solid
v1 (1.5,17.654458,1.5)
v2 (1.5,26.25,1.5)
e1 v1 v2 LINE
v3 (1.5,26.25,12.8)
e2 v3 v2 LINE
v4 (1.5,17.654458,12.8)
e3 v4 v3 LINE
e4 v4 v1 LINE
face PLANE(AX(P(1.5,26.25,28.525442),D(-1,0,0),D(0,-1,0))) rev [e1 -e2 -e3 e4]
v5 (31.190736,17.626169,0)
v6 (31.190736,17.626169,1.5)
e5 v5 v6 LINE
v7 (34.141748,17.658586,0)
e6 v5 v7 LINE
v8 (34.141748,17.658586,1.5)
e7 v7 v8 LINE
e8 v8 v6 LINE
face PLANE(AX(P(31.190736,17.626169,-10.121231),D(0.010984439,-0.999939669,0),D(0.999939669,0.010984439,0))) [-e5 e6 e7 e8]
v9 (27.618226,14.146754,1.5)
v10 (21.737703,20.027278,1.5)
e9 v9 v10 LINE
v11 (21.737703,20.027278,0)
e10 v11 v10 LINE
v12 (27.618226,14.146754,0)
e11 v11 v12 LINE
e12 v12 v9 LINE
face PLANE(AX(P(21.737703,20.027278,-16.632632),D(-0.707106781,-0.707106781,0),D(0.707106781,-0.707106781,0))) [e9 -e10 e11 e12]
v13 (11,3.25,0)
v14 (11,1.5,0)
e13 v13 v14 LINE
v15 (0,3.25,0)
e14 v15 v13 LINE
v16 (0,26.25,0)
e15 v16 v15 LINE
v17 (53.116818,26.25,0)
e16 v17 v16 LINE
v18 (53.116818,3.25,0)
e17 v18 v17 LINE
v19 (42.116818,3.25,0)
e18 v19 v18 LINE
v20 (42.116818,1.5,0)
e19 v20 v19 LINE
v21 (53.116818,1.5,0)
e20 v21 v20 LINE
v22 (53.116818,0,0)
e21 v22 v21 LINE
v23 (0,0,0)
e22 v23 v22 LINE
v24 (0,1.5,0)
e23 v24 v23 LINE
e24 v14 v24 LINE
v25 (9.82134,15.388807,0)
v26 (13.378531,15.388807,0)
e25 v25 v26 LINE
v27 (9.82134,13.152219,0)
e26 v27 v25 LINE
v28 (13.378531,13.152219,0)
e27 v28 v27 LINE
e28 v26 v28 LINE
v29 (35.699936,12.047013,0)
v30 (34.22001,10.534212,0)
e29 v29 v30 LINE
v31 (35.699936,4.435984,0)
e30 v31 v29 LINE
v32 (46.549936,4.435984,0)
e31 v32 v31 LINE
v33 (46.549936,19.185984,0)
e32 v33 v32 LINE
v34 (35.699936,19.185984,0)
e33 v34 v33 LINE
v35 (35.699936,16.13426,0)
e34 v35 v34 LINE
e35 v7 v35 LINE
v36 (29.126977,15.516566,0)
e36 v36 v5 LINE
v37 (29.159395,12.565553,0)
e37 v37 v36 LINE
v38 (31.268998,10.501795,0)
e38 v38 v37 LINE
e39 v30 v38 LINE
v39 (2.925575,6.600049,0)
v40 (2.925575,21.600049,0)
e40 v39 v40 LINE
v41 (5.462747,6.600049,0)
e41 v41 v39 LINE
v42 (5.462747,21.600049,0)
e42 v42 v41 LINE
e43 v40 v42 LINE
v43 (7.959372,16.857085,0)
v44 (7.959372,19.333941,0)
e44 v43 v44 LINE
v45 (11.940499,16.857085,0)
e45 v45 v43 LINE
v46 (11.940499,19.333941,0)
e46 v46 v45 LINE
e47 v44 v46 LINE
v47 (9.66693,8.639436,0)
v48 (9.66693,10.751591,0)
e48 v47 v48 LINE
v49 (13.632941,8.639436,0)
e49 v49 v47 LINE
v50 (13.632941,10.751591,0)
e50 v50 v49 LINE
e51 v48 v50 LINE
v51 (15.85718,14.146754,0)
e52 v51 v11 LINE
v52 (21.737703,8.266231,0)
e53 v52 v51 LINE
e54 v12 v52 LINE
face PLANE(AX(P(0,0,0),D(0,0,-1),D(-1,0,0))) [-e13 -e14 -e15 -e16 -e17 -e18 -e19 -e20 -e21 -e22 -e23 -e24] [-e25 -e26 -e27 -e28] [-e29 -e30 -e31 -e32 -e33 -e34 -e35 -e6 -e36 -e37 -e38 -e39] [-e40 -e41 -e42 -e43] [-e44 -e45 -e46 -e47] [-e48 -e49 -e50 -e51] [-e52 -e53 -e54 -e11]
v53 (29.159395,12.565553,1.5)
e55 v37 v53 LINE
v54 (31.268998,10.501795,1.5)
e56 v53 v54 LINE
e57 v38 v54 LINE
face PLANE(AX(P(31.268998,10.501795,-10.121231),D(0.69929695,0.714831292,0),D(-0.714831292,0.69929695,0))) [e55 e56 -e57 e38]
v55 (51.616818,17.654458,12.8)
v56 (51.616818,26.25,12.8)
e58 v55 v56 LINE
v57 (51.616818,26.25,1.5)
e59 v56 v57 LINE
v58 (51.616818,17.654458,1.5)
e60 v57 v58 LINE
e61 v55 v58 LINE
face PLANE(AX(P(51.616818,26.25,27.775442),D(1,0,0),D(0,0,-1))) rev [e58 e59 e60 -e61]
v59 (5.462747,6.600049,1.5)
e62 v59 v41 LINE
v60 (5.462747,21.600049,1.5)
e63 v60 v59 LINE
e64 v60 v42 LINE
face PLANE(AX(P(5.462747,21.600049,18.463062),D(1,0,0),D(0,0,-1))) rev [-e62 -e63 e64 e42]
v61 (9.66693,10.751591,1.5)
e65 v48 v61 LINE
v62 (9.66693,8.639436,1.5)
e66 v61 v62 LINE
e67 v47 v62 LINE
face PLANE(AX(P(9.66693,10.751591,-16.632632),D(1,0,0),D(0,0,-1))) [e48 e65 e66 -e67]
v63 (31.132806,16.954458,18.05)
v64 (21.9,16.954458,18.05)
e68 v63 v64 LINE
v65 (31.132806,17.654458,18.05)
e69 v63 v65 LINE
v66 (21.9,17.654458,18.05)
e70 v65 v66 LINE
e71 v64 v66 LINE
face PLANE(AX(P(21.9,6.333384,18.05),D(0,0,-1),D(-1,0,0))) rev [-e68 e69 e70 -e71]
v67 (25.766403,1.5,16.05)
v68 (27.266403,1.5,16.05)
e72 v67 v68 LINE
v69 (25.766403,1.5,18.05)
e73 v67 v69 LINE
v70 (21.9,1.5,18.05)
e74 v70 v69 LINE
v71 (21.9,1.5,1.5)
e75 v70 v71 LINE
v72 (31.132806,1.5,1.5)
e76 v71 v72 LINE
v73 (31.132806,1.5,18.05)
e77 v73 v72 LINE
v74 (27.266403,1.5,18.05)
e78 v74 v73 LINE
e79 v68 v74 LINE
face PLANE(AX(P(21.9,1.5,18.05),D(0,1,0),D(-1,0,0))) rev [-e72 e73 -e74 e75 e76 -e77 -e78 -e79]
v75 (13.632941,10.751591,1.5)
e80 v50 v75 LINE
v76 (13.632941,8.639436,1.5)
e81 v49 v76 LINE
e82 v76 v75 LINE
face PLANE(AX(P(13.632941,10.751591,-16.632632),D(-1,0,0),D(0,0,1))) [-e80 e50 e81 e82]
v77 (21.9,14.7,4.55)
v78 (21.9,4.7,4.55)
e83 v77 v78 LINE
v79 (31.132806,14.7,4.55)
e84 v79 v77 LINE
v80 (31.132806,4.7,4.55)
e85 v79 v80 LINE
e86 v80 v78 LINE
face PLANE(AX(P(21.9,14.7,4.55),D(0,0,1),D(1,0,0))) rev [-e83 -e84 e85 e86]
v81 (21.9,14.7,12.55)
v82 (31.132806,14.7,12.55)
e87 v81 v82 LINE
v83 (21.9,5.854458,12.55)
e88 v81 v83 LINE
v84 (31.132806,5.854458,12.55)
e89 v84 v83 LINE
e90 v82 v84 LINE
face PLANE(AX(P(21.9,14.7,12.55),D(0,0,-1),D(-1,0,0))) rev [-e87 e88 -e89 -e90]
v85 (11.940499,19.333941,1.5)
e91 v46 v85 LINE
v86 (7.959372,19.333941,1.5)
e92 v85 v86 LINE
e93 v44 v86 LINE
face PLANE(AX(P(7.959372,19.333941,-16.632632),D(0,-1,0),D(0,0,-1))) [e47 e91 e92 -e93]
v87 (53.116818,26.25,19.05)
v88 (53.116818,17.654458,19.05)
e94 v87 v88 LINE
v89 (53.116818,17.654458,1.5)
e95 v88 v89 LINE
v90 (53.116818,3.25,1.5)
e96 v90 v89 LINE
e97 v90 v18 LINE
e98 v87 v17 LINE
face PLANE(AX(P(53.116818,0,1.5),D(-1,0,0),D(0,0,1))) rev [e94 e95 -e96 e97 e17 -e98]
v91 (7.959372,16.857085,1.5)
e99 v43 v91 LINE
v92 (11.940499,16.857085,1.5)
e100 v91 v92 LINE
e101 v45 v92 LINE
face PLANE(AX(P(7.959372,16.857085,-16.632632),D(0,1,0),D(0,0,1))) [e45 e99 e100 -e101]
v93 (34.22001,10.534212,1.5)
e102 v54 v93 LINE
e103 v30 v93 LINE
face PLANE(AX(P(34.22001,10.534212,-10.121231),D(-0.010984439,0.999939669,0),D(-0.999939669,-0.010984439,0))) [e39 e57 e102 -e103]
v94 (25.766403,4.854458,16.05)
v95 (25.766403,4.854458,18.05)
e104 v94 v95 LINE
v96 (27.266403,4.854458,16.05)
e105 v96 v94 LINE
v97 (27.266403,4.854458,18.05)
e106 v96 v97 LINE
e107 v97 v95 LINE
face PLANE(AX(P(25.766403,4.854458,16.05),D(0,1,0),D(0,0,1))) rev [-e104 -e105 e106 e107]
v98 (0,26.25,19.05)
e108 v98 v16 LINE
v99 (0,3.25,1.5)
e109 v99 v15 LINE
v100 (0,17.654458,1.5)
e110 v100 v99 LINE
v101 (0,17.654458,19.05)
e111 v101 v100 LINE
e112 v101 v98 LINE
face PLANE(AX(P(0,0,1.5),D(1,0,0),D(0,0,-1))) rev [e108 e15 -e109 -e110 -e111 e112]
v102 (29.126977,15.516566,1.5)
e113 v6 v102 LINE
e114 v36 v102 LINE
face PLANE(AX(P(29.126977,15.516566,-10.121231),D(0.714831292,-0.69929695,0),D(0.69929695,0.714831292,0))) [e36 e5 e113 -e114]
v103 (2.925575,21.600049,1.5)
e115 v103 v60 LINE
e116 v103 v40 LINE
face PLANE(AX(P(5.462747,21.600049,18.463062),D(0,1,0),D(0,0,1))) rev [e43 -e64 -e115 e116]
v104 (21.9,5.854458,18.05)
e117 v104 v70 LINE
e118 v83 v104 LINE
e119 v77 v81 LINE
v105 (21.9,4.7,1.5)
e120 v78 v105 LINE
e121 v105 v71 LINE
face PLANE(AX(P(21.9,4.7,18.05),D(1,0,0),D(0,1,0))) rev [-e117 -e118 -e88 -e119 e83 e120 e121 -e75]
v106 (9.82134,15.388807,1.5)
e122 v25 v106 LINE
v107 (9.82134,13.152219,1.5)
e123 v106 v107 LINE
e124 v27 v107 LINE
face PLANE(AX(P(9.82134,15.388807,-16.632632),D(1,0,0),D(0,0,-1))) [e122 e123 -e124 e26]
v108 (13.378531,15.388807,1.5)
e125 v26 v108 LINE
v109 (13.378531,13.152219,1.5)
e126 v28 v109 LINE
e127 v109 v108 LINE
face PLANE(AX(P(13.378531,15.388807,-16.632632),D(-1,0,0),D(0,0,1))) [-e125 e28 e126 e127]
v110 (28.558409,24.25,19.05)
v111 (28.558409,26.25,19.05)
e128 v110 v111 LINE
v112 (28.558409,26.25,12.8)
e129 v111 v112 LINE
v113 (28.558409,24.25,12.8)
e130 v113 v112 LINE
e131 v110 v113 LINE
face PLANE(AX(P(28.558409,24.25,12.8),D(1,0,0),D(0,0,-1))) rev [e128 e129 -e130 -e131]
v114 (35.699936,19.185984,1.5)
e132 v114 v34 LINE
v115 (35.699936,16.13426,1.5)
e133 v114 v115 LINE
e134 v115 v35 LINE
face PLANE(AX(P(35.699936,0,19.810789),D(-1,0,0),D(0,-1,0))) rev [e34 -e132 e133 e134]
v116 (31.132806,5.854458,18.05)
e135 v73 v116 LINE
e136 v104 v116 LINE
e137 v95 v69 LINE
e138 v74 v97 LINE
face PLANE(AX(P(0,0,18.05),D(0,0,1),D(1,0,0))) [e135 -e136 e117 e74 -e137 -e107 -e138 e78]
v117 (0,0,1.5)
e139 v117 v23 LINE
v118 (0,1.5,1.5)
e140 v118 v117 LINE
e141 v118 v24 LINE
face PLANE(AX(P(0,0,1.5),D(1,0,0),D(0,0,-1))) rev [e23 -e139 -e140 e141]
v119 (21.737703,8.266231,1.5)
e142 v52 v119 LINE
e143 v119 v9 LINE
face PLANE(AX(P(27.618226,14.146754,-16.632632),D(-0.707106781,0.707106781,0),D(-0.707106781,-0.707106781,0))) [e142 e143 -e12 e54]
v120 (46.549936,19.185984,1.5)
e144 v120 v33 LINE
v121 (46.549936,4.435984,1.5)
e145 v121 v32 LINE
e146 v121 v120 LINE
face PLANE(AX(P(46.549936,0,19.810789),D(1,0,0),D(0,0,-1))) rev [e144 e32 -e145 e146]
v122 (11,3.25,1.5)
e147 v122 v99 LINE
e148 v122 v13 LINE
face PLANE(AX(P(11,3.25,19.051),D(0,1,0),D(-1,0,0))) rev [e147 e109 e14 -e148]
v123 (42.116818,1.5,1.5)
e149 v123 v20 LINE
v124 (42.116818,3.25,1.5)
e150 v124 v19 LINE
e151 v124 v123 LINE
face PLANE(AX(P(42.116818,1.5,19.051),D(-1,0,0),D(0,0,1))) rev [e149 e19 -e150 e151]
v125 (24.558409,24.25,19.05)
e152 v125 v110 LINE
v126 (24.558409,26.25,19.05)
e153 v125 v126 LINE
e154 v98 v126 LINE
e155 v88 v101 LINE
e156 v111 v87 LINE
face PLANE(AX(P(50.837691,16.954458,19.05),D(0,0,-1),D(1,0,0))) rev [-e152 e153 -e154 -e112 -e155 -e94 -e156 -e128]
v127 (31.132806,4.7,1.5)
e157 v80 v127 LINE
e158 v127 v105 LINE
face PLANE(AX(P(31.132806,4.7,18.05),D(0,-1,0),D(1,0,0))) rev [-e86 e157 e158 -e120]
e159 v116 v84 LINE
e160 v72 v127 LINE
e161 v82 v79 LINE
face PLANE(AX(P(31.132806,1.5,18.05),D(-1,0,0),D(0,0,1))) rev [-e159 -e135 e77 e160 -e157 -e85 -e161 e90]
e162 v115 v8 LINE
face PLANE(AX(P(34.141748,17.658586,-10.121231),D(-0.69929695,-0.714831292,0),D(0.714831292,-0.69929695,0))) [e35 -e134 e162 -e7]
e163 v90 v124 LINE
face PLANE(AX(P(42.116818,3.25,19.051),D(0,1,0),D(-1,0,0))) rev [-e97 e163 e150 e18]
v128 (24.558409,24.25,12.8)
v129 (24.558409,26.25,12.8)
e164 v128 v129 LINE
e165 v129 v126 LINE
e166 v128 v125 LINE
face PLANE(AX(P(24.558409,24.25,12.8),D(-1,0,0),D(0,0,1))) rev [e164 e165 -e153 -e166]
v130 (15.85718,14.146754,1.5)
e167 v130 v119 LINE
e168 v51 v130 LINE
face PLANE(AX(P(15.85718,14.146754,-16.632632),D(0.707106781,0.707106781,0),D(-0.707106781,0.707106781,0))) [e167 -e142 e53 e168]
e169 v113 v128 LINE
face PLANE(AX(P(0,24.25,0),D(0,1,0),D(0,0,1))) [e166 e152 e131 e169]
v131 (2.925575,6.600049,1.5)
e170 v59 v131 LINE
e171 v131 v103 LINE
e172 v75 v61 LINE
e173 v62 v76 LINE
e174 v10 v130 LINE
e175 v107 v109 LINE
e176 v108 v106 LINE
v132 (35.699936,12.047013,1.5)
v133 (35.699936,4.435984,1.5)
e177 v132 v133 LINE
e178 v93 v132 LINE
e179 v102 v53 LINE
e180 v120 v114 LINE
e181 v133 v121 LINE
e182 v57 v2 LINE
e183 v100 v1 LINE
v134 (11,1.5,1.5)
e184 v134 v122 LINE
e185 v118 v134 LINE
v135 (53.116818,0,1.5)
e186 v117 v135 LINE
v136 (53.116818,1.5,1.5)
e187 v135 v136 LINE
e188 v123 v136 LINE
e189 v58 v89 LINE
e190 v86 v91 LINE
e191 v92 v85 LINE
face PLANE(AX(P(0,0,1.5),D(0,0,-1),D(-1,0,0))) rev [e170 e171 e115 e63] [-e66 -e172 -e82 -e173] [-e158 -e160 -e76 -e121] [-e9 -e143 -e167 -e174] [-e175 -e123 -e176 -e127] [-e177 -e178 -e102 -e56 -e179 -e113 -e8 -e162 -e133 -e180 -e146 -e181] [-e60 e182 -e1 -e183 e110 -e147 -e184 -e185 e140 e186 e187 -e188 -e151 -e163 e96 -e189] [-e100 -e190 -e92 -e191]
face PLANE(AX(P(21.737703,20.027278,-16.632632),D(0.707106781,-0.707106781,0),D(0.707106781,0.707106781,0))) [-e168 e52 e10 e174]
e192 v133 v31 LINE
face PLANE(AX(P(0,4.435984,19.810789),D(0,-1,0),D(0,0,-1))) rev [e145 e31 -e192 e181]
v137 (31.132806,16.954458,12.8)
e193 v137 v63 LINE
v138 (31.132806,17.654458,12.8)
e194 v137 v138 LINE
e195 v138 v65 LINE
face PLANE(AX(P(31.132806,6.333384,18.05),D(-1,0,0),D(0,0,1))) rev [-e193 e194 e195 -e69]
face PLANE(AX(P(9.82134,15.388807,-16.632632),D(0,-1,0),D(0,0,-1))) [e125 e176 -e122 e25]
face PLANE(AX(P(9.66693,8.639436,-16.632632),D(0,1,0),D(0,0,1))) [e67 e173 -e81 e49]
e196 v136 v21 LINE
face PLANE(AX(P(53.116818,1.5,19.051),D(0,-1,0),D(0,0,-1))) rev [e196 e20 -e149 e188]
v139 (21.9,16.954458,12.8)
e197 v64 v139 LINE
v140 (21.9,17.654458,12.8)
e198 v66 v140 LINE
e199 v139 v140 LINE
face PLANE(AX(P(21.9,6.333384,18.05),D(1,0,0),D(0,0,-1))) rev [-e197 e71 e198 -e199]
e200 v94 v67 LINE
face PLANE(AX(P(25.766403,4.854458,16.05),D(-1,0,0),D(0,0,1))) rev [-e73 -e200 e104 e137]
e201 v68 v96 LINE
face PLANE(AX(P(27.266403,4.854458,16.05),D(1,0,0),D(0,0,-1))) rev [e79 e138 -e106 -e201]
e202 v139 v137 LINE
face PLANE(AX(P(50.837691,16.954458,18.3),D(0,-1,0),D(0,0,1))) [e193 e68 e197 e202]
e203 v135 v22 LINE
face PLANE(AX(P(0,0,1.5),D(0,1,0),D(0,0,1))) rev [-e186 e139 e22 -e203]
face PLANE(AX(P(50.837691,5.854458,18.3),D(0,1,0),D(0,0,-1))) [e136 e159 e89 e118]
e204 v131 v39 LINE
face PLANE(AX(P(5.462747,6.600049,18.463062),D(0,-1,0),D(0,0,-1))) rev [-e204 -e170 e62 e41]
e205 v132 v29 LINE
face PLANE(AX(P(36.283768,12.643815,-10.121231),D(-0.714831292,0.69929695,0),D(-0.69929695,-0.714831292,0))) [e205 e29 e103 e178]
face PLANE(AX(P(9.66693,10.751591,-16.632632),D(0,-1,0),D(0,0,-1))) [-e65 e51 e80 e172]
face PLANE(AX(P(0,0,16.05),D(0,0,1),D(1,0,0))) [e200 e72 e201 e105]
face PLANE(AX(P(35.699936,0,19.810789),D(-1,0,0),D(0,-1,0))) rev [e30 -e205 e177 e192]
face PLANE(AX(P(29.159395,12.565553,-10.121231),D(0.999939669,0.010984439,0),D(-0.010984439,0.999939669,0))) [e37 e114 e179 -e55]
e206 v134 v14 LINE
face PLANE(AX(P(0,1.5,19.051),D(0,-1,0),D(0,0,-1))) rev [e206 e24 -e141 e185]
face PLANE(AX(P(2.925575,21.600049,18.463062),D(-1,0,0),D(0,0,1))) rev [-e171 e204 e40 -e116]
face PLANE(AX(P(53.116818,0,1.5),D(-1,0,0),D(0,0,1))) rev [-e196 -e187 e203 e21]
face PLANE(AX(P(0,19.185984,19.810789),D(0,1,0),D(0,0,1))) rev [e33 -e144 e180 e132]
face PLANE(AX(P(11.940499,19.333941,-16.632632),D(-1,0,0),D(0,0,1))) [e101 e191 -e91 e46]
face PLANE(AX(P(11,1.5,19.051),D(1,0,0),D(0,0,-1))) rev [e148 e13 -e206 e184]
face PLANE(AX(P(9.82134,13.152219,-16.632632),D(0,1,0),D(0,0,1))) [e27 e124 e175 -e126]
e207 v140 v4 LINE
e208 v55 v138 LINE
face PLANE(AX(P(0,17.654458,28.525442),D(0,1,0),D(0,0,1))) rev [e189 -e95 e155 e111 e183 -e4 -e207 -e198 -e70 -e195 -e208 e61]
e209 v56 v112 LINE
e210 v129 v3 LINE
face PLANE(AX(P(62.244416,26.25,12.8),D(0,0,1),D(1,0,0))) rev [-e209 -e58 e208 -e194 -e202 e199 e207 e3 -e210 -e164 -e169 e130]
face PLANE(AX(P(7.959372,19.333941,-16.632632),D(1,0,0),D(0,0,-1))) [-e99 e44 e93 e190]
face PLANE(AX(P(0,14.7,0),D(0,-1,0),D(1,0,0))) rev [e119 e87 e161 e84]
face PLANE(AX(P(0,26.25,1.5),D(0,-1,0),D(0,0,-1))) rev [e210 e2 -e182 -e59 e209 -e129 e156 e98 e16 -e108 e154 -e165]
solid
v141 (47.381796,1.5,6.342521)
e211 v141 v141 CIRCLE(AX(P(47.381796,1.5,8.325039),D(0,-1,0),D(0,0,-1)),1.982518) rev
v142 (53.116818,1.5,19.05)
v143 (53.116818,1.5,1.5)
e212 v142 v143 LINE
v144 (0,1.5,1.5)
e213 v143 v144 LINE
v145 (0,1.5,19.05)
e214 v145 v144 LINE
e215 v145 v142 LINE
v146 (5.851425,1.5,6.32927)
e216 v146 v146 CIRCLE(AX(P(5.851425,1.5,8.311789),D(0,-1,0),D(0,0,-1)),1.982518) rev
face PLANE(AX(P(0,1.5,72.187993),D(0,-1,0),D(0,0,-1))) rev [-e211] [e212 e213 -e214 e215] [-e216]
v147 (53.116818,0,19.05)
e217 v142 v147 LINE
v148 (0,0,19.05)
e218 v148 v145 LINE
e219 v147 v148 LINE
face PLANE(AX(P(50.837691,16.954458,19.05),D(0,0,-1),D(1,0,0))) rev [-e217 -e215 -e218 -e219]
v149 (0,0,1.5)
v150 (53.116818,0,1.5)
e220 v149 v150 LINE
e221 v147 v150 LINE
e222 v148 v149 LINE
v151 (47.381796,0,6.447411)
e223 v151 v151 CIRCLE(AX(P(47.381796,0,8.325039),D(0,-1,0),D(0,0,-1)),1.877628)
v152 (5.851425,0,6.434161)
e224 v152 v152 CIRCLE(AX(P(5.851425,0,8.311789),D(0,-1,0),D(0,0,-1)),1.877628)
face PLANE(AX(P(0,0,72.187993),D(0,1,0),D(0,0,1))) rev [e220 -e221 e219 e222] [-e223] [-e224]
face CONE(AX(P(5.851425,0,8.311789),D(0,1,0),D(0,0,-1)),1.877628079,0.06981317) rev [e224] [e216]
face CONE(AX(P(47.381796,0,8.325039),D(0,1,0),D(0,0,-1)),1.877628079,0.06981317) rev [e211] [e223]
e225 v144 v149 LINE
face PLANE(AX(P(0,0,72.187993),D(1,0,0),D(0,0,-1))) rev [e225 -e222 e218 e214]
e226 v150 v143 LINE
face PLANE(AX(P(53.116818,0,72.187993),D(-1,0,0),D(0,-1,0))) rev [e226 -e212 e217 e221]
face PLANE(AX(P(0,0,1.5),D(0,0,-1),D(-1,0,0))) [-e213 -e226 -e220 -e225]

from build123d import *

# Parameters (mm, degrees)
SKETCH1_W                              = 53.116817528
SKETCH1_H                              = 26.25
FRONT_SIDE_MAIN_DEPTH                  = 1.5
RESET_HOLE_DEPTH                       = 3.25
SKETCH15_W                             = 3.966010581
SKETCH15_H                             = 2.112155191
SKETCH15_W_2                           = 3.557190409
SKETCH15_H_2                           = 2.236587576
SKETCH15_W_3                           = 3.981127105
SKETCH15_H_3                           = 2.476855865
COMPONENT_HOLES_DEPTH                  = 3.25
SKETCH16_W                             = 10.85
SKETCH16_H                             = 14.75
MICROPHONE_HOLE_DEPTH                  = 1.5
SKETCH24_W                             = 1.5
SKETCH24_H                             = 8.595542059
RIGHT_SIDE_TOP_DEPTH                   = 17.55
SKETCH20_W                             = 53.116817528
SKETCH20_H                             = 1.5
BOTTOM_BASE_DEPTH                      = 17.55
SKETCH26_W                             = 1.5
SKETCH26_H                             = 8.595542059
LEFT_SIDE_TOP_DEPTH                    = 17.55
SKETCH27_W                             = 6.25
SKETCH27_H                             = 8.595542059
BACK_BAR_TOP_DEPTH                     = 50.116817528
SERVO_SEPERATOR_BOTTOM_OUTLINE_W       = 9.232806166
SERVO_SEPERATOR_BOTTOM_OUTLINE_H       = 3.2
SERVO_SEPERATOR_BOTTOM_DEPTH           = 16.55
SKETCH28_W                             = 9.232806166
SKETCH28_H                             = 5.25
BACK_BATTERY_HOLDER_TOP_DEPTH          = 0.7
SKETCH34_W                             = 2.537171882
SKETCH34_H                             = 15
PROGRAMMING_HOLE_DEPTH                 = 3.25
SKETCH38_W                             = 9.232806166
SKETCH38_H                             = 5.5
BACK_BATTERY_HOLDER_BOTTOM_DEPTH       = 1.154457941
SKETCH40_R                             = 1.877628079
SERVO_ARM_HOLES_BOTTOM_DEPTH           = 1.5
SERVO_ARM_HOLES_BOTTOM_DRAFT           = 4
SERVO_ARM_HOLES_BOTTOM_PROFILE_2_DEPTH = 1.5
SERVO_ARM_HOLES_BOTTOM_PROFILE_2_DRAFT = 4
SKETCH44_W                             = 1.5
SKETCH44_H                             = 3.354457941
SNAP_HOLE_BOTTOM_DEPTH                 = 2
SKETCH46_W                             = 4
SKETCH46_H                             = 6.25
SNAP_CUT_TOP_DEPTH                     = 2
SKETCH47_W                             = 11
SKETCH47_H                             = 1.75
SOLAR_ARM_HOLES_FRONT_DEPTH            = 1.5
SKETCH49_W                             = 9.232806166
SKETCH49_H                             = 8
RAISED_SERVO_SEPERATOR_DEPTH           = 10


# Read off the part's stored shape, not the designer's step: Servo Seperator - Bottom
with BuildPart() as part:
    # Sketch1 → Front Side - Main (new body)
    with BuildSketch(Plane.XY):
        with Locations((26.558408764, 13.125)):
            Rectangle(SKETCH1_W, SKETCH1_H)
    extrude(amount=FRONT_SIDE_MAIN_DEPTH)

    # Reset Hole Sketch → Reset Hole (cut)
    with BuildSketch(Plane(origin=(0, 0, 3.25), x_dir=(-1, 0, 0), z_dir=(0, 0, -1))):
        Polygon((-31.190735744, 17.626168756), (-34.141748042, 17.658585925), (-36.251351249, 15.594827519), (-36.283768419, 12.643815222), (-34.220010013, 10.534212015), (-31.268997715, 10.501794845), (-29.159394508, 12.565553251), (-29.126977338, 15.516565548), align=None)
    extrude(amount=RESET_HOLE_DEPTH, mode=Mode.SUBTRACT)

    # Sketch15 → Component Holes (cut)
    with BuildSketch(Plane(origin=(0, 0, 3.25), x_dir=(-1, 0, 0), z_dir=(0, 0, -1))):
        Polygon((-21.737702993, 20.027277789), (-15.857179586, 14.146754382), (-21.737702993, 8.266230975), (-27.6182264, 14.146754382), align=None)
        with Locations((-11.649935563, 9.695513201)):
            Rectangle(SKETCH15_W, SKETCH15_H)
        with Locations((-11.599935563, 14.270513201)):
            Rectangle(SKETCH15_W_2, SKETCH15_H_2)
        with Locations((-9.949935563, 18.095513201)):
            Rectangle(SKETCH15_W_3, SKETCH15_H_3)
    extrude(amount=COMPONENT_HOLES_DEPTH, mode=Mode.SUBTRACT)

    # Sketch16 → Microphone Hole (cut)
    with BuildSketch(Plane(origin=(0, 0, 0), x_dir=(-1, 0, 0), z_dir=(0, 0, -1))):
        with Locations((-41.124935562, 11.81098353)):
            Rectangle(SKETCH16_W, SKETCH16_H)
    extrude(amount=-MICROPHONE_HOLE_DEPTH, mode=Mode.SUBTRACT)

    # Sketch24 → Right Side - Top (add)
    with BuildSketch(Plane.XY.offset(1.5)):
        with Locations((0.75, 21.952228971)):
            Rectangle(SKETCH24_W, SKETCH24_H)
    extrude(amount=RIGHT_SIDE_TOP_DEPTH)

    # Sketch26 → Left Side - Top (add)
    with BuildSketch(Plane.XY.offset(1.5)):
        with Locations((52.366817528, 21.952228971)):
            Rectangle(SKETCH26_W, SKETCH26_H)
    extrude(amount=LEFT_SIDE_TOP_DEPTH)

    # Sketch27 → Back Bar - Top (add)
    with BuildSketch(Plane(origin=(1.5, 0, 0), x_dir=(0, 0, -1), z_dir=(1, 0, 0))):
        with Locations((-15.925, 21.952228971)):
            Rectangle(SKETCH27_W, SKETCH27_H)
    extrude(amount=BACK_BAR_TOP_DEPTH)

    # Servo Seperator - Bottom outline → Servo Seperator - Bottom (add)
    with BuildSketch(Plane.XY.offset(1.5)):
        with Locations((26.516403083, 3.1)):
            Rectangle(SERVO_SEPERATOR_BOTTOM_OUTLINE_W, SERVO_SEPERATOR_BOTTOM_OUTLINE_H)
    extrude(amount=SERVO_SEPERATOR_BOTTOM_DEPTH)

    # Sketch28 → Back Battery Holder - Top (add)
    with BuildSketch(Plane.XZ.offset(-17.654457941)):
        with Locations((26.516403083, 15.425)):
            Rectangle(SKETCH28_W, SKETCH28_H)
    extrude(amount=BACK_BATTERY_HOLDER_TOP_DEPTH)

    # Sketch34 → Programming Hole (cut)
    with BuildSketch(Plane(origin=(0, 0, 0), x_dir=(-1, 0, 0), z_dir=(0, 0, -1))):
        with Locations((-4.194161079, 14.100049249)):
            Rectangle(SKETCH34_W, SKETCH34_H)
    extrude(amount=-PROGRAMMING_HOLE_DEPTH, mode=Mode.SUBTRACT)

    # Sketch38 → Back Battery Holder - Bottom (add)
    with BuildSketch(Plane(origin=(0, 4.7, 0), x_dir=(1, 0, 0), z_dir=(0, 1, 0))):
        with Locations((26.516403083, -15.3)):
            Rectangle(SKETCH38_W, SKETCH38_H)
    extrude(amount=BACK_BATTERY_HOLDER_BOTTOM_DEPTH)

    # Sketch44 → Snap Hole - Bottom (cut)
    with BuildSketch(Plane.XY.offset(18.05)):
        with Locations((26.516403083, 3.177228971)):
            Rectangle(SKETCH44_W, SKETCH44_H)
    extrude(amount=-SNAP_HOLE_BOTTOM_DEPTH, mode=Mode.SUBTRACT)

    # Sketch46 → Snap Cut - Top (cut)
    with BuildSketch(Plane(origin=(0, 26.25, 0), x_dir=(1, 0, 0), z_dir=(0, 1, 0))):
        with Locations((26.558408764, -15.925)):
            Rectangle(SKETCH46_W, SKETCH46_H)
    extrude(amount=-SNAP_CUT_TOP_DEPTH, mode=Mode.SUBTRACT)

    # Sketch47 → Solar Arm Holes - Front (cut)
    with BuildSketch(Plane(origin=(0, 0, 0), x_dir=(-1, 0, 0), z_dir=(0, 0, -1))):
        with Locations((-5.5, 2.375)):
            Rectangle(SKETCH47_W, SKETCH47_H)
        with Locations((-47.616817528, 2.375)):
            Rectangle(SKETCH47_W, SKETCH47_H)
    extrude(amount=-SOLAR_ARM_HOLES_FRONT_DEPTH, mode=Mode.SUBTRACT)

    # Sketch49 → Raised Servo Seperator (add)
    with BuildSketch(Plane(origin=(0, 4.7, 0), x_dir=(1, 0, 0), z_dir=(0, 1, 0))):
        with Locations((26.516403083, -8.55)):
            Rectangle(SKETCH49_W, SKETCH49_H)
    extrude(amount=RAISED_SERVO_SEPERATOR_DEPTH)


with BuildPart() as body_2:
    # Sketch20 → Bottom Base (new body)
    with BuildSketch(Plane.XY.offset(1.5)):
        with Locations((26.558408764, 0.75)):
            Rectangle(SKETCH20_W, SKETCH20_H)
    extrude(amount=BOTTOM_BASE_DEPTH)


with BuildPart() as servo_arm_holes_bottom_tool:
    # Sketch40 → Servo arm Holes - Bottom (with draft: the straight prism first)
    with BuildSketch(Plane.XZ):
        with Locations((5.851424663, 8.311788641)):
            Circle(SKETCH40_R)
    extrude(amount=-SERVO_ARM_HOLES_BOTTOM_DEPTH)
    # Servo arm Holes - Bottom: the draft: its side faces are tilted about the plane it starts from
    servo_arm_holes_bottom_sides = [servo_arm_holes_bottom_tool.faces().sort_by_distance(p)[0] for p in [
        (3.973796583, 0.75, 8.311788641),
    ]]
    draft(servo_arm_holes_bottom_sides, Plane.XZ, SERVO_ARM_HOLES_BOTTOM_DRAFT)


with BuildPart() as body_2_1:
    add(body_2.part)

    # Servo arm Holes - Bottom: cut by servo_arm_holes_bottom_tool
    add(servo_arm_holes_bottom_tool.part, mode=Mode.SUBTRACT)


with BuildPart() as servo_arm_holes_bottom_profile_2_tool:
    # Sketch40 → Servo arm Holes - Bottom profile 2 (with draft: the straight prism first)
    with BuildSketch(Plane.XZ):
        with Locations((47.381795968, 8.325039035)):
            Circle(SKETCH40_R)
    extrude(amount=-SERVO_ARM_HOLES_BOTTOM_PROFILE_2_DEPTH)
    # Servo arm Holes - Bottom profile 2: the draft: its side faces are tilted about the plane it starts from
    servo_arm_holes_bottom_profile_2_sides = [servo_arm_holes_bottom_profile_2_tool.faces().sort_by_distance(p)[0] for p in [
        (45.504167889, 0.75, 8.325039035),
    ]]
    draft(servo_arm_holes_bottom_profile_2_sides, Plane.XZ, SERVO_ARM_HOLES_BOTTOM_PROFILE_2_DRAFT)


with BuildPart() as body_2_2:
    add(body_2_1.part)

    # Servo arm Holes - Bottom profile 2: cut by servo_arm_holes_bottom_profile_2_tool
    add(servo_arm_holes_bottom_profile_2_tool.part, mode=Mode.SUBTRACT)


solid = Compound([part.part, body_2_2.part])
